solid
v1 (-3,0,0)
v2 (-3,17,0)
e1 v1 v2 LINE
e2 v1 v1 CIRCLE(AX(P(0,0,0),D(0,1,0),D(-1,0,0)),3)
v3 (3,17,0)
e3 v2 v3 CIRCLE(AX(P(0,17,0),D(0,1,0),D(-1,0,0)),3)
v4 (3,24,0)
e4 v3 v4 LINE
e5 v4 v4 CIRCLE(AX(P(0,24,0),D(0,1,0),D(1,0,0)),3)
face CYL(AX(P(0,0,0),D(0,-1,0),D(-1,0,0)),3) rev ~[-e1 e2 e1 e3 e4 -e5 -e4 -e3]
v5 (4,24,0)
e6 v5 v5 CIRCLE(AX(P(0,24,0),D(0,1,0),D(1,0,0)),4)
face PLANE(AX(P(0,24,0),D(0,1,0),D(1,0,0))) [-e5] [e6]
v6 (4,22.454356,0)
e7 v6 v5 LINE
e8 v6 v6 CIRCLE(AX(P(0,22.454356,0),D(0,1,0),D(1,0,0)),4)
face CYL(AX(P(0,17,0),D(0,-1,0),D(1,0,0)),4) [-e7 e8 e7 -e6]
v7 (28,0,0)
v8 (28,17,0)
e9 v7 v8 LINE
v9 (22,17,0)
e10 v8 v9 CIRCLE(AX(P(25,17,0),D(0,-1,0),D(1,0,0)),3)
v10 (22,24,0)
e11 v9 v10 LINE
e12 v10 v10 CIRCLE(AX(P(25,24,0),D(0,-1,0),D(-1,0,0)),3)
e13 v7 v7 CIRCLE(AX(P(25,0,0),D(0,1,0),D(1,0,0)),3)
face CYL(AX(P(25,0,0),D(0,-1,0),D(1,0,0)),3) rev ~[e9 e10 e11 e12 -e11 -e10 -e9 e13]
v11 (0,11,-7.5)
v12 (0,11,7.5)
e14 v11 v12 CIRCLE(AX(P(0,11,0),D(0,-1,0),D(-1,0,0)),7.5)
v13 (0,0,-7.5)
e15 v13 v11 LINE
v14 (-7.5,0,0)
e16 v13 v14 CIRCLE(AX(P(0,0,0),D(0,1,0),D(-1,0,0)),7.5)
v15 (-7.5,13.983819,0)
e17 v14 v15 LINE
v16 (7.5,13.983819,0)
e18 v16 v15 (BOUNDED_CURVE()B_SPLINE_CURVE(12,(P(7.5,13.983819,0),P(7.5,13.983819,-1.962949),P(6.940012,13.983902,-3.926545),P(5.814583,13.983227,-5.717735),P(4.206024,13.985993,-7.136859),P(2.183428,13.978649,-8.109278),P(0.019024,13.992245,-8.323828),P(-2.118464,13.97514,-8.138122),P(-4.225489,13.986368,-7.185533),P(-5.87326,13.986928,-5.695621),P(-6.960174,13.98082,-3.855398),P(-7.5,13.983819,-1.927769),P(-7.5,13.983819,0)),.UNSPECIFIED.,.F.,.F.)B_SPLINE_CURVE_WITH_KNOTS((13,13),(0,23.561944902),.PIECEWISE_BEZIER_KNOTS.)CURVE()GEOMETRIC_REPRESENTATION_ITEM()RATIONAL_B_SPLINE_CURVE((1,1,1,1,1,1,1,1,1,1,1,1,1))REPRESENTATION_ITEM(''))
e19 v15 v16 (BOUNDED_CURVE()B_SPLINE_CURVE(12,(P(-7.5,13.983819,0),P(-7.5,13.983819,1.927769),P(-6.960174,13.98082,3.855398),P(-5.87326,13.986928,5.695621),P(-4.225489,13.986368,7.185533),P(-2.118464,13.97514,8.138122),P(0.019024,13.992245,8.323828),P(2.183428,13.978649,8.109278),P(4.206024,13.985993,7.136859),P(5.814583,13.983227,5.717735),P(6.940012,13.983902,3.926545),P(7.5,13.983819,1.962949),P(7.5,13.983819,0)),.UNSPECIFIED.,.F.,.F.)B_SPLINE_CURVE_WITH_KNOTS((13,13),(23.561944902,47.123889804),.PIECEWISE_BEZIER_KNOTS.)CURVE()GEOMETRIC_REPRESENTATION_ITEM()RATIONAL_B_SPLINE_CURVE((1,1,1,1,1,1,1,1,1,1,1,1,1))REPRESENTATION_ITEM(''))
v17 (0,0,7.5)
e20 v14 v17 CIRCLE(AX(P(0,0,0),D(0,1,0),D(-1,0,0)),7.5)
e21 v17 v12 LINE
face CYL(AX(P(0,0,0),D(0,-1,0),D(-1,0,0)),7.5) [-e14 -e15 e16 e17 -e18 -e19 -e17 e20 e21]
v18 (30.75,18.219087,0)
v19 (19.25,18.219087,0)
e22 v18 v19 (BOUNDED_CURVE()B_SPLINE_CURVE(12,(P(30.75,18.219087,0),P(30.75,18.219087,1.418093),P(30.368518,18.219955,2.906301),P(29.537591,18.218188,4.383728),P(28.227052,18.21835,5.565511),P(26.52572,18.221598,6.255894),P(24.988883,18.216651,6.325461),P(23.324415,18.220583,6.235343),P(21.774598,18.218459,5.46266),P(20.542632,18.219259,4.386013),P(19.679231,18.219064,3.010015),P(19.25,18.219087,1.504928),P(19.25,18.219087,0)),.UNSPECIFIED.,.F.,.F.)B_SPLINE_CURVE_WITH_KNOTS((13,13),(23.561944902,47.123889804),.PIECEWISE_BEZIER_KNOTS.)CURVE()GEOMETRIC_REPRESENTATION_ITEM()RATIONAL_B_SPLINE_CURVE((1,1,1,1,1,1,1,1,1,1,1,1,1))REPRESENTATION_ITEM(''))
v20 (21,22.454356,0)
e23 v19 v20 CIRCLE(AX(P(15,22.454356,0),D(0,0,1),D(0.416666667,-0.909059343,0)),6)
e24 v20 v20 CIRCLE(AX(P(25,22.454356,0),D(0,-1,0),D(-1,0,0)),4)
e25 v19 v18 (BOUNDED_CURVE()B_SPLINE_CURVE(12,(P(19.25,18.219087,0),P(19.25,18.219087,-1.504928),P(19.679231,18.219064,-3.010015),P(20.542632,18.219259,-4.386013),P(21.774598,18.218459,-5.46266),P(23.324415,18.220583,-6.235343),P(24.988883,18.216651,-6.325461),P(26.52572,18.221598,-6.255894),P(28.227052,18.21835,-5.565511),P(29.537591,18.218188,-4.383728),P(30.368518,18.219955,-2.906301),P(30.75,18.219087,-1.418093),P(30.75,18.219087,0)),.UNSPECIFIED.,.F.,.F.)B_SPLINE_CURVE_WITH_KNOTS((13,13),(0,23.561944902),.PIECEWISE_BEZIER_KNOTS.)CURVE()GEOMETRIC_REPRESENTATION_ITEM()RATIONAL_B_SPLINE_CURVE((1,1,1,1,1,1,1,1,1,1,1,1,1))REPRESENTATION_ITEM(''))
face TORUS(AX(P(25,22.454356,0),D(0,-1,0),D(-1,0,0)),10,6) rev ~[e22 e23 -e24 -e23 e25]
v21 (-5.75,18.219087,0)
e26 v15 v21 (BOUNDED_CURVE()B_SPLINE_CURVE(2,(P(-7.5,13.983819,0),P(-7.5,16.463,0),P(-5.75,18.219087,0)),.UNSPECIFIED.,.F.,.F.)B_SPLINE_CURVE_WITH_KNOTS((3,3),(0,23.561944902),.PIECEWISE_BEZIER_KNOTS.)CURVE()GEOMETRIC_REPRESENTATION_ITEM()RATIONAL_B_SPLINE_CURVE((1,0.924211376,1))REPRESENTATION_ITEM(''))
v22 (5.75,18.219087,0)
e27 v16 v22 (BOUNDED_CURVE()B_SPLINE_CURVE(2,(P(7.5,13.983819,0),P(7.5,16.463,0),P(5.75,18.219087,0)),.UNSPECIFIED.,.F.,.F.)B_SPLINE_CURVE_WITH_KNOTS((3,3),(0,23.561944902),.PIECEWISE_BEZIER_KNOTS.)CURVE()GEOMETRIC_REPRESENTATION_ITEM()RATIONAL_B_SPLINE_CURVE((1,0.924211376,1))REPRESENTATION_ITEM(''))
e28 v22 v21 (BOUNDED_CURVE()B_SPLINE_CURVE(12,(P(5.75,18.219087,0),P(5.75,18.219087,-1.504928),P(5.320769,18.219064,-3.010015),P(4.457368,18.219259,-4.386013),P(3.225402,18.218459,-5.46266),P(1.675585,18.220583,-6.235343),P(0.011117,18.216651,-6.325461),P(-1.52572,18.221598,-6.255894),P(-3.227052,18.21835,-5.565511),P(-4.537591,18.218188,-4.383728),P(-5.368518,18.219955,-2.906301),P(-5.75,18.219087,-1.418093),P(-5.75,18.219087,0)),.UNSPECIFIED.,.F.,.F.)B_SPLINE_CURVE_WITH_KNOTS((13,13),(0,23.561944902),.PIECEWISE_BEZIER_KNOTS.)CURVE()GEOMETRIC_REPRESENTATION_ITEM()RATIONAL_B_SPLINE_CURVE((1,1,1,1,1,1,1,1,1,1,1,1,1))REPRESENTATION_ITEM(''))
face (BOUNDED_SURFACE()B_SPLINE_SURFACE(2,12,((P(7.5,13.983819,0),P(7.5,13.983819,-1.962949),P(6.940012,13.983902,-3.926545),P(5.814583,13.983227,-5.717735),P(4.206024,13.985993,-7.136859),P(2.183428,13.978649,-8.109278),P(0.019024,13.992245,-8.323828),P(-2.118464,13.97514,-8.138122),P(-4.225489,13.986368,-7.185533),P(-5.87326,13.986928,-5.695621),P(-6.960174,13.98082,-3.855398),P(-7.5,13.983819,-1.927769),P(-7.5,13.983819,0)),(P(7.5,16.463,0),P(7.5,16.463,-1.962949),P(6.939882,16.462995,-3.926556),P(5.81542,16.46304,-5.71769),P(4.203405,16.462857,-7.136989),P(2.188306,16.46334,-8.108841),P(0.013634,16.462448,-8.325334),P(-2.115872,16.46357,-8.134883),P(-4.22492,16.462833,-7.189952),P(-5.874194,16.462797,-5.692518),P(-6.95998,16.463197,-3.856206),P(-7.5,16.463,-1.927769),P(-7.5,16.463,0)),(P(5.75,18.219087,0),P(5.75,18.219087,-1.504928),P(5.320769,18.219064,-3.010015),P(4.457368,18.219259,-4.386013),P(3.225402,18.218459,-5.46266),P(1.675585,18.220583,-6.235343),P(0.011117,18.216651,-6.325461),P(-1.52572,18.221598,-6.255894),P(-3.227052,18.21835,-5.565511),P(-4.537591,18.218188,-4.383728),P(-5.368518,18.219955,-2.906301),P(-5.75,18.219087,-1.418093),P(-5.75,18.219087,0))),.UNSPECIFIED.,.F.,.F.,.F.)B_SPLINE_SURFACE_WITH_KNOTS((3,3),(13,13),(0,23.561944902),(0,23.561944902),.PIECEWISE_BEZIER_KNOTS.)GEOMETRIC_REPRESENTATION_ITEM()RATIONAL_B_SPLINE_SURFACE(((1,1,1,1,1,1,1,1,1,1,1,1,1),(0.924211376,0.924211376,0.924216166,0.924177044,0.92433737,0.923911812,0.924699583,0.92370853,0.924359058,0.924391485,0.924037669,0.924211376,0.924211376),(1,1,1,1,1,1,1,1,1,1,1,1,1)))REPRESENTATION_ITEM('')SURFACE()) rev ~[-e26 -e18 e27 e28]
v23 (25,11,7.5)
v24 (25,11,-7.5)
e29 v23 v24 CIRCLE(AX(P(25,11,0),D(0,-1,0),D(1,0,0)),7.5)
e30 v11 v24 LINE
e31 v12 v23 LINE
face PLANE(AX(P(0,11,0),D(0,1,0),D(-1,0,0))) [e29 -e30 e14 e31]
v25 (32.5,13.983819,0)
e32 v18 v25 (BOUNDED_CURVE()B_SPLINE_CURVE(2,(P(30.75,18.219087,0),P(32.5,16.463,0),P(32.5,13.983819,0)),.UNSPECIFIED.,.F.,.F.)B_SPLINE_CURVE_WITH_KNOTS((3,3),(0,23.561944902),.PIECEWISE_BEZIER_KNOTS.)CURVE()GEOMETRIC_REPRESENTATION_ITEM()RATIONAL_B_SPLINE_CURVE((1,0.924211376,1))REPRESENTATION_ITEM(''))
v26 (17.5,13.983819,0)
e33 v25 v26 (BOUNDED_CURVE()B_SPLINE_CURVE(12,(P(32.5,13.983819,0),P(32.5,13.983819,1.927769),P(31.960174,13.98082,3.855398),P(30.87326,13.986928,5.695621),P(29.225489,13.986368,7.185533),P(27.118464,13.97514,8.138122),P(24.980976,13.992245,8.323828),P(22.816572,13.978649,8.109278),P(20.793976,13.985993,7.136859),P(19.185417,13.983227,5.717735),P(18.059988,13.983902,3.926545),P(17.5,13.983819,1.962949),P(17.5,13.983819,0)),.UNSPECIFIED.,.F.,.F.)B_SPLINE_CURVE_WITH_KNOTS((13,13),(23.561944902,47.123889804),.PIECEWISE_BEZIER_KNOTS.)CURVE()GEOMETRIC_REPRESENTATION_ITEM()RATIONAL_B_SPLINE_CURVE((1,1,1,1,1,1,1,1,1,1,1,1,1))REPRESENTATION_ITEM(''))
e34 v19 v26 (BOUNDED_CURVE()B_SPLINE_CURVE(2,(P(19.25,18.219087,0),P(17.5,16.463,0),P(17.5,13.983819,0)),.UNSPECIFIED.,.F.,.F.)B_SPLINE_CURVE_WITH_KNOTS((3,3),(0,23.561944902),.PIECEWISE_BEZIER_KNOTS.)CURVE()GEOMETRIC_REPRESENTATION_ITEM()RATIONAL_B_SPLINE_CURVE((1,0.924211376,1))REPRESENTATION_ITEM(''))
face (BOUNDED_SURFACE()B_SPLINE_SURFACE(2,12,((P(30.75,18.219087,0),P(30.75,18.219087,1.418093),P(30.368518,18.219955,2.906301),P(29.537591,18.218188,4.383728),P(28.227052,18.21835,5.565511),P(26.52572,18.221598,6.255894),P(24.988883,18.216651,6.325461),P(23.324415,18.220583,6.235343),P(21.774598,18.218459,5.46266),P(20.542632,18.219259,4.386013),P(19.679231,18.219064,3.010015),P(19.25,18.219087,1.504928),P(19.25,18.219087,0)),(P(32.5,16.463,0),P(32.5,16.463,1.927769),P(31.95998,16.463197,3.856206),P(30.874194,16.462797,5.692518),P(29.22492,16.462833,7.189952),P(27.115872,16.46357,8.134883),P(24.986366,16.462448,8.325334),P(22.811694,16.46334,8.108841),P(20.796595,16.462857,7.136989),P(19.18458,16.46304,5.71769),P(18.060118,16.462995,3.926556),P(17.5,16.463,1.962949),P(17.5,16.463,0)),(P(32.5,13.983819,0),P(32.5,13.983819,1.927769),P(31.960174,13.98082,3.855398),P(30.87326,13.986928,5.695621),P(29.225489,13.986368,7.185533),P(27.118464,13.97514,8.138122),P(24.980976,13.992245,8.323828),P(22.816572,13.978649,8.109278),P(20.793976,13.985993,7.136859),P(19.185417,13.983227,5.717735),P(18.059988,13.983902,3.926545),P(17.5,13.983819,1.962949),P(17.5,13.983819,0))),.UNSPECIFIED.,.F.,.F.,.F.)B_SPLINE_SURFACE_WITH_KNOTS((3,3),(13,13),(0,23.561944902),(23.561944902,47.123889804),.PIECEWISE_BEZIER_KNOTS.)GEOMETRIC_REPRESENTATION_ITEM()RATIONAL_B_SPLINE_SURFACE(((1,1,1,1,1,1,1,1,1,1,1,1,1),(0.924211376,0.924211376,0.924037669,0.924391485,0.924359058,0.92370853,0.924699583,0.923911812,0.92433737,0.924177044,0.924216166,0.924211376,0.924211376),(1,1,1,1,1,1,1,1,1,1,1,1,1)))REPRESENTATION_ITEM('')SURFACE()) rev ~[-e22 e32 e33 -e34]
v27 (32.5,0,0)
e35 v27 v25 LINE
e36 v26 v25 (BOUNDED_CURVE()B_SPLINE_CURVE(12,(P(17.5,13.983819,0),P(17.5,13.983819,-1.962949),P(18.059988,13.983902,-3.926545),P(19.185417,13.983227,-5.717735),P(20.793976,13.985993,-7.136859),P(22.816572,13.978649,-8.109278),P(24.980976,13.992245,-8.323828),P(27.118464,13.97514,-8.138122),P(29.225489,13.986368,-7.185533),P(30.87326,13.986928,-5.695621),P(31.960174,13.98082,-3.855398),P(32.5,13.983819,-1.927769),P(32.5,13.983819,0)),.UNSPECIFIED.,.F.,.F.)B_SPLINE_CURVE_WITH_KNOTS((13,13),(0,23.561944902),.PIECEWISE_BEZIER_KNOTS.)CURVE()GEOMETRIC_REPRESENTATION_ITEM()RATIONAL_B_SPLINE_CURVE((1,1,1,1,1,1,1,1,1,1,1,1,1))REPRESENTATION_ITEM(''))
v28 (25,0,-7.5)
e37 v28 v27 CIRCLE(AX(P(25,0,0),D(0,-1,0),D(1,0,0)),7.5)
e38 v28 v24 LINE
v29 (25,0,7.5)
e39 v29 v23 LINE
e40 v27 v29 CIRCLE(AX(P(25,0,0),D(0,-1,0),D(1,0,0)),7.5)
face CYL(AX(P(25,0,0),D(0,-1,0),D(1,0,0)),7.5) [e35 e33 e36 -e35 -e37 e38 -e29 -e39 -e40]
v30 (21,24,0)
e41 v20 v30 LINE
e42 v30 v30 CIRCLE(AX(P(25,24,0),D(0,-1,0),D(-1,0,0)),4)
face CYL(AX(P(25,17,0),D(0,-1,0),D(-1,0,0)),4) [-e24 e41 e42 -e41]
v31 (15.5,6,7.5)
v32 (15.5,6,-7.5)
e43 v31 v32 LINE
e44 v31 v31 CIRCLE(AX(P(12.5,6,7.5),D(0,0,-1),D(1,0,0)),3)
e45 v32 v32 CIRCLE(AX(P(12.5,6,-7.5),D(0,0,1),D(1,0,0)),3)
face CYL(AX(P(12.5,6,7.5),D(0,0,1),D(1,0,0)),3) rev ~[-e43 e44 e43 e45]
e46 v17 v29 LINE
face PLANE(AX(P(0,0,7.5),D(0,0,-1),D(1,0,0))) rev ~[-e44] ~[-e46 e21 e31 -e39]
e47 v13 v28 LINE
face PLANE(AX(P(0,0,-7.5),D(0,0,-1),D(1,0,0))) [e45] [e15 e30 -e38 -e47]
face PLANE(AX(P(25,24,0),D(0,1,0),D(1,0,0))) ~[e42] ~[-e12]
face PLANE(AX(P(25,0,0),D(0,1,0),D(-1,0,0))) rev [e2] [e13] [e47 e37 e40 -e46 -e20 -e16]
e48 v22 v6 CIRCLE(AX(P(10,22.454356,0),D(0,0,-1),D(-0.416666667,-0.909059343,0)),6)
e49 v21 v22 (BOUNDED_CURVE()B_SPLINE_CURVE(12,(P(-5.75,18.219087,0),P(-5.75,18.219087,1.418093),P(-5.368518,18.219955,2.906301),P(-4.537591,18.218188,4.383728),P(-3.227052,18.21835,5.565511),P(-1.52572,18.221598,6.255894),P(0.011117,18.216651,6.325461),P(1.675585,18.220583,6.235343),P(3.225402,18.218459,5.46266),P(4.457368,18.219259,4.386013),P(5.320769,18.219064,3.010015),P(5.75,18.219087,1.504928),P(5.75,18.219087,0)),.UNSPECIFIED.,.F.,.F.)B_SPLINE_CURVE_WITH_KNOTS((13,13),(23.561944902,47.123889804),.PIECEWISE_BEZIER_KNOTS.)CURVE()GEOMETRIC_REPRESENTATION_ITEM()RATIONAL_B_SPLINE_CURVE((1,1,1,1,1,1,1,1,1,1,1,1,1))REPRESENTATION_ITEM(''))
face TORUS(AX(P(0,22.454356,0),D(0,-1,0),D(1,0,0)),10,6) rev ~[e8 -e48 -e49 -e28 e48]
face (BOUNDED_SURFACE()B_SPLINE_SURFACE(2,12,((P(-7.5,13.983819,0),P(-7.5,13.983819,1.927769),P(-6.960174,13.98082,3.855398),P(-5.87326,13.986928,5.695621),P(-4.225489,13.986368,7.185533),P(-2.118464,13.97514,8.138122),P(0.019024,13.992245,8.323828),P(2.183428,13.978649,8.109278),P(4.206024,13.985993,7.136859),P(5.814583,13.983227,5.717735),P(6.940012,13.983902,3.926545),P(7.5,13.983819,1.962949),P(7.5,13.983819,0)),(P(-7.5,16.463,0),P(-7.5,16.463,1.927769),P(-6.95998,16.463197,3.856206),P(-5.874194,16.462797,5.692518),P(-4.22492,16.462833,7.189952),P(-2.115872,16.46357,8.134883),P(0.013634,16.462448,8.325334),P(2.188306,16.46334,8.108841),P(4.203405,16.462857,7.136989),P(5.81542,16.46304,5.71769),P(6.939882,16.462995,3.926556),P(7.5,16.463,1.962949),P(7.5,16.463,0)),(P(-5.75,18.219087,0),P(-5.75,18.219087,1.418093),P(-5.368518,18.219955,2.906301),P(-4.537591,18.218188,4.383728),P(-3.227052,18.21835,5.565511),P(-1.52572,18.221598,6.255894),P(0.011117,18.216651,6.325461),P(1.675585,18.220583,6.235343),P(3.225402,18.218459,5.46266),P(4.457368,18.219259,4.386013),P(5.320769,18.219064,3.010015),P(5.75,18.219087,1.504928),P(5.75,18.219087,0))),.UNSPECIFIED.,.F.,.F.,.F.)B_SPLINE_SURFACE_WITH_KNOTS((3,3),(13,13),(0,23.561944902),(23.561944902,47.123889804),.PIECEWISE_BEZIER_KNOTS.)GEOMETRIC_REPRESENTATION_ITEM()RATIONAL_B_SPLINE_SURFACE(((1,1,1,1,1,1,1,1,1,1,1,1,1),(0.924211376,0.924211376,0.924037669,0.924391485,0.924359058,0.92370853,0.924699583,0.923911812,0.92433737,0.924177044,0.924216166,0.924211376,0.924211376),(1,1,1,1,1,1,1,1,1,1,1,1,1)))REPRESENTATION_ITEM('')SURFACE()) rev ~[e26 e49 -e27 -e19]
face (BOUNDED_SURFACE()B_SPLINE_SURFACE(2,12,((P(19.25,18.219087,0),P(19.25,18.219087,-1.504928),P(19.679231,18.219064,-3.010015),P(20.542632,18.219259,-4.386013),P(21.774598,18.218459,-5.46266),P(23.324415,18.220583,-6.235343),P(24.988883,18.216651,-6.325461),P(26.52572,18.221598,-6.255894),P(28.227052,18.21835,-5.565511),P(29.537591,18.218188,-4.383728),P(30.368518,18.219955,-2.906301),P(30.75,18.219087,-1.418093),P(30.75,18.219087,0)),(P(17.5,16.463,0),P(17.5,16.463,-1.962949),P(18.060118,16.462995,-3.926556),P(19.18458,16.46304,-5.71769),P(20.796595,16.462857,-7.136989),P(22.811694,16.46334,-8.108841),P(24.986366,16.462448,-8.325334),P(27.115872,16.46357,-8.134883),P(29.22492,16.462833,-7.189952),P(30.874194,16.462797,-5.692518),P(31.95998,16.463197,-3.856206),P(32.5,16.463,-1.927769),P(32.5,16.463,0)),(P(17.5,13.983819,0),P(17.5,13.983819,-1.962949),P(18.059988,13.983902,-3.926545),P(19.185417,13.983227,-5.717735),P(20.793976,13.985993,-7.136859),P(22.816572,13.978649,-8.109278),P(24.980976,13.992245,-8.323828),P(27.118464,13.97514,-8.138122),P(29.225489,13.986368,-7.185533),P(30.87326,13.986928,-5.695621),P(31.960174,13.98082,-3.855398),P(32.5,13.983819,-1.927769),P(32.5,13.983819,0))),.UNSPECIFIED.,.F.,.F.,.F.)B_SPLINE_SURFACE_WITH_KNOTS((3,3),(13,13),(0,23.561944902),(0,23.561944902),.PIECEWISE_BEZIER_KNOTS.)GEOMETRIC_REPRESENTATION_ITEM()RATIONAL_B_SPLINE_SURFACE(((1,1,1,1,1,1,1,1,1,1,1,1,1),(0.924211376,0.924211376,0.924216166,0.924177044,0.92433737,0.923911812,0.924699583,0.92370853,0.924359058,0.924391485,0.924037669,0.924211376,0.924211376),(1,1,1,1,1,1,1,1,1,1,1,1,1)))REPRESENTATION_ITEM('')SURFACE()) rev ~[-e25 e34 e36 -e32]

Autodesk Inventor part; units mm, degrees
ref_plane "XZ Plane" through (0, 0, 0) normal (0, 1, 0) x (-1, 0, 0)
ref_plane "XY Plane" through (0, 0, 0) normal (0, 0, 1) x (1, 0, 0)
sketch "Sketch1" plane through (0, 0, 0) normal (0, 1, 0) x (-1, 0, 0)
  circle A0 centre (0, 0) radius 7.5
  circle A1 centre (0, 0) radius 3
  dimension "d0" = 15
  dimension "d1" = 6
extrude "Extrusion1" add sketch "Sketch1" along normal blind 17
sketch "Sketch2" plane through (0, 17, 0) normal (0, 1, 0) x (1, 0, 0)
  circle A0 centre (0, 0) radius 3 projected
  circle A1 centre (0, 0) radius 2.75
  circle A2 centre (0, 0) radius 4
  dimension "d4" = 5.5
  dimension "d5" = 8
extrude "Extrusion2" add sketch "Sketch2" along normal blind 7 contours A2
fillet "Fillet1" radius 6 1 edges at (-4, 17, 0)
fillet "Fillet2" radius 6 2 edges at (0, 17, -7.5) (0, 17, 7.5)
ref_plane "Work Plane1" through (12.5, 0, 0) normal (1, 0, 0) x (0, 1, 0)
mirror "Mirror1" about plane through (12.5, 0, 0) normal (1, 0, 0) of "Extrusion1", "Extrusion2", "Fillet1", "Fillet2"
sketch "Sketch3" plane through (0, 0, 0) normal (0, 1, 0) x (-1, 0, 0)
  circle A0 centre (-25, 0) radius 3 projected
  line L0 (-25, 0) -> (-25, 3)
  line L1 (-25, 0) -> (-25, -3)
  line L2 (0, 0) -> (0, -3)
  circle A1 centre (0, 0) radius 3 projected
  line L3 (0, 0) -> (0, 3)
  line L4 (-25, 3) -> (0, 3)
  line L5 (0, 3) -> (0, 7.5)
  line L6 (0, 7.5) -> (-25, 7.5)
  line L7 (-25, 7.5) -> (-25, 3)
  line L8 (-25, -3) -> (0, -3)
  line L9 (0, -3) -> (0, -7.5)
  line L10 (0, -7.5) -> (-25, -7.5)
  line L11 (-25, -7.5) -> (-25, -3)
  point P0 (0, -3)
  point P1 (0, 3)
  dimension "d11" = 25
  dimension "d12" = 4.5
  dimension "d13" = 25
  dimension "d14" = 4.5
extrude "Extrusion3" add sketch "Sketch3" along normal blind 11 contours A0 L4 A1 L8 | L7 L6 L5 L4 | L8 L9 L10 L11
sketch "Sketch4" plane through (0, 0, 7.5) normal (0, 0, 1) x (1, 0, 0)
  line L0 (25, 11) -> (0, 11) projected
  line L1 (12.5, 11) -> (12.5, 6)
  circle A0 centre (12.5, 6) radius 3
  point P0 (0, 0)
  dimension "d17" = 5
  dimension "d18" = 6
extrude "Extrusion4" cut sketch "Sketch4" against normal through all
properties part number "4mm_Roller_Spacer_simple"
